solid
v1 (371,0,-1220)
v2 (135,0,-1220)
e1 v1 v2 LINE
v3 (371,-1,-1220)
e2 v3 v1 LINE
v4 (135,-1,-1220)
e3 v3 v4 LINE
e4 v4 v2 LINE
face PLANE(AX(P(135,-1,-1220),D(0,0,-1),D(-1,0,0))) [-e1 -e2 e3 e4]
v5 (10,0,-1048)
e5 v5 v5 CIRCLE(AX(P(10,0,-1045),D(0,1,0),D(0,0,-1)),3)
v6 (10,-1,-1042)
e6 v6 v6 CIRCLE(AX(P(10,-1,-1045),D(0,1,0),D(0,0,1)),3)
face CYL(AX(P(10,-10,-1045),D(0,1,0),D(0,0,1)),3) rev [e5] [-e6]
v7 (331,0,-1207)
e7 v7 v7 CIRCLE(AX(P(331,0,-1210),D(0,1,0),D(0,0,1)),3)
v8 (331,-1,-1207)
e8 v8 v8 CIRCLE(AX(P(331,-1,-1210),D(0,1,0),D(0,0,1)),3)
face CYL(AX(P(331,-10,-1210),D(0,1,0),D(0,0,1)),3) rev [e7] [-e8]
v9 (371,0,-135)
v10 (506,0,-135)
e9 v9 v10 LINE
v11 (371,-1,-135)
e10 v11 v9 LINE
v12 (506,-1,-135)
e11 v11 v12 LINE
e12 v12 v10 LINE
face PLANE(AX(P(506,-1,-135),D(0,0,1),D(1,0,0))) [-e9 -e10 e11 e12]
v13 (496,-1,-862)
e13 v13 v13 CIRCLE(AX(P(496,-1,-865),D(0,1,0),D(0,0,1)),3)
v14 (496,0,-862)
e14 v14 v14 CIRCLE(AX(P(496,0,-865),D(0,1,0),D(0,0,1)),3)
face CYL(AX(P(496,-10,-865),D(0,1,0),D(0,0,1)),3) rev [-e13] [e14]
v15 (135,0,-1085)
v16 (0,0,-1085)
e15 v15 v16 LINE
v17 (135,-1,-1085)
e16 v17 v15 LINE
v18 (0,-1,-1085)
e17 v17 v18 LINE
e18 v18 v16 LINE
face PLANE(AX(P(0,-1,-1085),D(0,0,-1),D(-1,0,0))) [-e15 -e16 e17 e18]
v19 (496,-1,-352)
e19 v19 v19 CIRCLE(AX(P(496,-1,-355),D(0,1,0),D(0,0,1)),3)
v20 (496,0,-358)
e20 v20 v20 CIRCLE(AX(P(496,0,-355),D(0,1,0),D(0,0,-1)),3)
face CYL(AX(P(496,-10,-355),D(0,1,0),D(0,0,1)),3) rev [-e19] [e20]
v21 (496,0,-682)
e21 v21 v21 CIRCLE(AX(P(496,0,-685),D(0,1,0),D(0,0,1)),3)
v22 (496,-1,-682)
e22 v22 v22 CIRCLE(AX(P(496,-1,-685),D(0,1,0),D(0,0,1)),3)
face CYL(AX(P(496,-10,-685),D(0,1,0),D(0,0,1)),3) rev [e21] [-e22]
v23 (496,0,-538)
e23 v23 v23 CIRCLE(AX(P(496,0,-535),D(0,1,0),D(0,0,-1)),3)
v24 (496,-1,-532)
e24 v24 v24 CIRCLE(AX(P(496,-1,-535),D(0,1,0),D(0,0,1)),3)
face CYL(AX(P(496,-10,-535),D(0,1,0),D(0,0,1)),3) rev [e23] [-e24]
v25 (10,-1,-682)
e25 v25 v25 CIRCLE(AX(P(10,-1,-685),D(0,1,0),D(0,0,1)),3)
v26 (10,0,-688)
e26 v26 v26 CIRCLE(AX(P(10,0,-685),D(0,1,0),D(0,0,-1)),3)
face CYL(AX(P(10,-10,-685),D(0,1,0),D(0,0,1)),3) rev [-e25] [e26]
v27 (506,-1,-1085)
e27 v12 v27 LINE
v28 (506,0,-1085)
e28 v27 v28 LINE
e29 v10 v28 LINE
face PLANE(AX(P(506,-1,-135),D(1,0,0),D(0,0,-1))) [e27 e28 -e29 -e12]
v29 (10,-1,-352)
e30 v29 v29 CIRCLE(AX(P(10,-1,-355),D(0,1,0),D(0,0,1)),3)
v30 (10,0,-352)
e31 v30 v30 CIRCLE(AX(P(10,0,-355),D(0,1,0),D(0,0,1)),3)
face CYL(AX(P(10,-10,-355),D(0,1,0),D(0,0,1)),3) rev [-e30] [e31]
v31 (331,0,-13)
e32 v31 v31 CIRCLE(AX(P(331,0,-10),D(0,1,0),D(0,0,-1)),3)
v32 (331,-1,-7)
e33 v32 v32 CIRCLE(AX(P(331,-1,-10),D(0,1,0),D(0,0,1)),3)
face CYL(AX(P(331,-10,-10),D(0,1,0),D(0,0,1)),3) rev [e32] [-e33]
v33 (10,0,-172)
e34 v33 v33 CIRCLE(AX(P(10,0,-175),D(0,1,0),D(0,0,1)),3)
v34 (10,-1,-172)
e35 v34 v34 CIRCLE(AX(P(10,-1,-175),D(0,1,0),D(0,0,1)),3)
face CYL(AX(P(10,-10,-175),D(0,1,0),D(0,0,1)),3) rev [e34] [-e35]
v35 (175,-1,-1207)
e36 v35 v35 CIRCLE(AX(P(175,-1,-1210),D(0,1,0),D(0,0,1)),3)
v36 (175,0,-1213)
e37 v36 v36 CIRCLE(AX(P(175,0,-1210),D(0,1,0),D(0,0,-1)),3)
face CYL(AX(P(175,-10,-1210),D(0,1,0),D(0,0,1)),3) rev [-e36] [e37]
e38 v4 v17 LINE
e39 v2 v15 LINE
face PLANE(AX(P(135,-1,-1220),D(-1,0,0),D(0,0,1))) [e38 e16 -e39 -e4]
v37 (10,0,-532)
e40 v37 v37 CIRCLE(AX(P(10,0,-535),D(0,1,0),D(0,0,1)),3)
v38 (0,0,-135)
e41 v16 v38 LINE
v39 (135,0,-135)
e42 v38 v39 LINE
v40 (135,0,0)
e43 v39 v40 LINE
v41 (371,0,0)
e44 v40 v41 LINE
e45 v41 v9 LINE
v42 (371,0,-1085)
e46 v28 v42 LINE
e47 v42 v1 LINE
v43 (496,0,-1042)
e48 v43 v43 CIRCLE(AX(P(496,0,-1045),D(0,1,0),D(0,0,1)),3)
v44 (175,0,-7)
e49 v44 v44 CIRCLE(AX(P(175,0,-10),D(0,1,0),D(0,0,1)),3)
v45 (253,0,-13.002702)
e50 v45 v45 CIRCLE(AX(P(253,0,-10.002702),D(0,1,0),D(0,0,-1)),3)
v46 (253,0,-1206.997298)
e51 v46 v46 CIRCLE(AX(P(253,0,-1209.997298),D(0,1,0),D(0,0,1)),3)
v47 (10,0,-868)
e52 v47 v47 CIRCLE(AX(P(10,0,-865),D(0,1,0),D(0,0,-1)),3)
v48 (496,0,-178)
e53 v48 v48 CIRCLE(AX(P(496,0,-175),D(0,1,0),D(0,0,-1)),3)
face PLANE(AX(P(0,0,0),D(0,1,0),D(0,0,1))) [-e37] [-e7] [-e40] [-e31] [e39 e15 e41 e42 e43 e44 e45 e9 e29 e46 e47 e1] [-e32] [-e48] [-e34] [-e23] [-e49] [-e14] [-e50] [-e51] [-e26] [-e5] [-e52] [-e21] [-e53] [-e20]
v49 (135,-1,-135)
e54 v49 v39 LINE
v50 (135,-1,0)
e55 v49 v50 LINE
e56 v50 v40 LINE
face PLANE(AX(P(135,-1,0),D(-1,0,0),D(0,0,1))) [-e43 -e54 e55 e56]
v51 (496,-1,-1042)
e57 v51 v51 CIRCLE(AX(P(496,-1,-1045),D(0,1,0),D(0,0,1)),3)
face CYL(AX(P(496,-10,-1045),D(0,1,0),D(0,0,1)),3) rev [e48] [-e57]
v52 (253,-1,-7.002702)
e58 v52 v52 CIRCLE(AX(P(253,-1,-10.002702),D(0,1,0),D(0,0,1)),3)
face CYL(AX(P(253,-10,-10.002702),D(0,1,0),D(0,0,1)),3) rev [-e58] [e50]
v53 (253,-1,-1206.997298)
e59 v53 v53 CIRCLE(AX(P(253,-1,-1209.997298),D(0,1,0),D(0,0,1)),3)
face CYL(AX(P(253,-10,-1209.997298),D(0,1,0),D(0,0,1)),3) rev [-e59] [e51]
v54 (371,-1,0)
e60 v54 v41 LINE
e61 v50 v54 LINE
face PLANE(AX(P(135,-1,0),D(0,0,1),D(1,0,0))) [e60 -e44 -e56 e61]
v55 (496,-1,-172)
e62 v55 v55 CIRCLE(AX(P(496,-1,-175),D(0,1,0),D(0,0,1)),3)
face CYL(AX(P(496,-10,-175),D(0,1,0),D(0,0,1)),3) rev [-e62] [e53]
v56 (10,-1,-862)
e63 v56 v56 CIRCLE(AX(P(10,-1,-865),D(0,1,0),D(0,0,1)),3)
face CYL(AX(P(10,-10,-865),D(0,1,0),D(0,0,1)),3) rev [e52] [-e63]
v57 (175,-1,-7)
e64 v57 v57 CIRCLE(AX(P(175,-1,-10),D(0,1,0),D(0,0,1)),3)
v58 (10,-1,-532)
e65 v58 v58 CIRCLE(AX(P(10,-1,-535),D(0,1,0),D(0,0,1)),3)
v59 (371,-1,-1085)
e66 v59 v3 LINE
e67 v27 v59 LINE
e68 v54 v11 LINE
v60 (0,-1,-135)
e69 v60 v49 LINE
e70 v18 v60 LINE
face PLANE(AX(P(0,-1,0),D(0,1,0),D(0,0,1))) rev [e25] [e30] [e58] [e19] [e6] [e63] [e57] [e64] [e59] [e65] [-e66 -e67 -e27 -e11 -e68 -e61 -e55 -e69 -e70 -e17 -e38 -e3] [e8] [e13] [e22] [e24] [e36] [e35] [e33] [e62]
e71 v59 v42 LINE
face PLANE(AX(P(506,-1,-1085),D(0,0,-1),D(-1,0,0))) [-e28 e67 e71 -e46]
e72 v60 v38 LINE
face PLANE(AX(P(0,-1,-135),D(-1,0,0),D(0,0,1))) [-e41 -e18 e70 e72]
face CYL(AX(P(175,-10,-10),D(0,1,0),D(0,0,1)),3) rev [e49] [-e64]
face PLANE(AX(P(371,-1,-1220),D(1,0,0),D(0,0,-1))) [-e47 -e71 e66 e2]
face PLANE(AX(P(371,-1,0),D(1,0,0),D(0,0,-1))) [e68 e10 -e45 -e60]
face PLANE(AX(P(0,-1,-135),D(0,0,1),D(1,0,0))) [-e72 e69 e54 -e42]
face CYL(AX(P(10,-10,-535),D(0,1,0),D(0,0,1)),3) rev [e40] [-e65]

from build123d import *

# Parameters (mm, degrees)
BASE_FLANGE1_DEPTH = 1
SKETCH6_R          = 3
CUT_EXTRUDE1_DEPTH = 10


# Sheet-metal steps are written as plain solids
with BuildPart() as part:
    # Sketch1 → Base-Flange1 (new body)
    with BuildSketch(Plane(origin=(0, 0, 0), x_dir=(1, 0, 0), z_dir=(0, 1, 0))):
        Polygon((135, 0), (371, 0), (371, 135), (506, 135), (506, 1085), (371, 1085), (371, 1220), (135, 1220), (135, 1085), (0, 1085), (0, 135), (135, 135), align=None)
    extrude(amount=-BASE_FLANGE1_DEPTH)

    # Sketch6 → Cut-Extrude1 (cut)
    with BuildSketch(Plane(origin=(0, 0, 0), x_dir=(1, 0, 0), z_dir=(0, 1, 0))):
        with Locations(Location((496, 1045, 0), (0, 0, 270))):
            Circle(SKETCH6_R)
        with Locations(Location((496, 865, 0), (0, 0, 270))):
            Circle(SKETCH6_R)
        with Locations(Location((496, 685, 0), (0, 0, 270))):
            Circle(SKETCH6_R)
        with Locations(Location((331, 1210, 0), (0, 0, 270))):
            Circle(SKETCH6_R)
        with Locations(Location((175, 1210, 0), (0, 0, 270))):
            Circle(SKETCH6_R)
        with Locations(Location((10, 685, 0), (0, 0, 270))):
            Circle(SKETCH6_R)
        with Locations(Location((10, 865, 0), (0, 0, 270))):
            Circle(SKETCH6_R)
        with Locations(Location((10, 1045, 0), (0, 0, 270))):
            Circle(SKETCH6_R)
        with Locations(Location((253, 1209.997298013, 0), (0, 0, 270))):
            Circle(SKETCH6_R)
        with Locations(Location((253, 10.002701987, 0), (0, 0, 270))):
            Circle(SKETCH6_R)
        with Locations(Location((10, 175, 0), (0, 0, 270))):
            Circle(SKETCH6_R)
        with Locations(Location((10, 355, 0), (0, 0, 270))):
            Circle(SKETCH6_R)
        with Locations(Location((10, 535, 0), (0, 0, 270))):
            Circle(SKETCH6_R)
        with Locations(Location((175, 10, 0), (0, 0, 270))):
            Circle(SKETCH6_R)
        with Locations(Location((331, 10, 0), (0, 0, 270))):
            Circle(SKETCH6_R)
        with Locations(Location((496, 535, 0), (0, 0, 270))):
            Circle(SKETCH6_R)
        with Locations(Location((496, 355, 0), (0, 0, 270))):
            Circle(SKETCH6_R)
        with Locations(Location((496, 175, 0), (0, 0, 270))):
            Circle(SKETCH6_R)
    extrude(amount=-CUT_EXTRUDE1_DEPTH, mode=Mode.SUBTRACT)


solid = part.part
